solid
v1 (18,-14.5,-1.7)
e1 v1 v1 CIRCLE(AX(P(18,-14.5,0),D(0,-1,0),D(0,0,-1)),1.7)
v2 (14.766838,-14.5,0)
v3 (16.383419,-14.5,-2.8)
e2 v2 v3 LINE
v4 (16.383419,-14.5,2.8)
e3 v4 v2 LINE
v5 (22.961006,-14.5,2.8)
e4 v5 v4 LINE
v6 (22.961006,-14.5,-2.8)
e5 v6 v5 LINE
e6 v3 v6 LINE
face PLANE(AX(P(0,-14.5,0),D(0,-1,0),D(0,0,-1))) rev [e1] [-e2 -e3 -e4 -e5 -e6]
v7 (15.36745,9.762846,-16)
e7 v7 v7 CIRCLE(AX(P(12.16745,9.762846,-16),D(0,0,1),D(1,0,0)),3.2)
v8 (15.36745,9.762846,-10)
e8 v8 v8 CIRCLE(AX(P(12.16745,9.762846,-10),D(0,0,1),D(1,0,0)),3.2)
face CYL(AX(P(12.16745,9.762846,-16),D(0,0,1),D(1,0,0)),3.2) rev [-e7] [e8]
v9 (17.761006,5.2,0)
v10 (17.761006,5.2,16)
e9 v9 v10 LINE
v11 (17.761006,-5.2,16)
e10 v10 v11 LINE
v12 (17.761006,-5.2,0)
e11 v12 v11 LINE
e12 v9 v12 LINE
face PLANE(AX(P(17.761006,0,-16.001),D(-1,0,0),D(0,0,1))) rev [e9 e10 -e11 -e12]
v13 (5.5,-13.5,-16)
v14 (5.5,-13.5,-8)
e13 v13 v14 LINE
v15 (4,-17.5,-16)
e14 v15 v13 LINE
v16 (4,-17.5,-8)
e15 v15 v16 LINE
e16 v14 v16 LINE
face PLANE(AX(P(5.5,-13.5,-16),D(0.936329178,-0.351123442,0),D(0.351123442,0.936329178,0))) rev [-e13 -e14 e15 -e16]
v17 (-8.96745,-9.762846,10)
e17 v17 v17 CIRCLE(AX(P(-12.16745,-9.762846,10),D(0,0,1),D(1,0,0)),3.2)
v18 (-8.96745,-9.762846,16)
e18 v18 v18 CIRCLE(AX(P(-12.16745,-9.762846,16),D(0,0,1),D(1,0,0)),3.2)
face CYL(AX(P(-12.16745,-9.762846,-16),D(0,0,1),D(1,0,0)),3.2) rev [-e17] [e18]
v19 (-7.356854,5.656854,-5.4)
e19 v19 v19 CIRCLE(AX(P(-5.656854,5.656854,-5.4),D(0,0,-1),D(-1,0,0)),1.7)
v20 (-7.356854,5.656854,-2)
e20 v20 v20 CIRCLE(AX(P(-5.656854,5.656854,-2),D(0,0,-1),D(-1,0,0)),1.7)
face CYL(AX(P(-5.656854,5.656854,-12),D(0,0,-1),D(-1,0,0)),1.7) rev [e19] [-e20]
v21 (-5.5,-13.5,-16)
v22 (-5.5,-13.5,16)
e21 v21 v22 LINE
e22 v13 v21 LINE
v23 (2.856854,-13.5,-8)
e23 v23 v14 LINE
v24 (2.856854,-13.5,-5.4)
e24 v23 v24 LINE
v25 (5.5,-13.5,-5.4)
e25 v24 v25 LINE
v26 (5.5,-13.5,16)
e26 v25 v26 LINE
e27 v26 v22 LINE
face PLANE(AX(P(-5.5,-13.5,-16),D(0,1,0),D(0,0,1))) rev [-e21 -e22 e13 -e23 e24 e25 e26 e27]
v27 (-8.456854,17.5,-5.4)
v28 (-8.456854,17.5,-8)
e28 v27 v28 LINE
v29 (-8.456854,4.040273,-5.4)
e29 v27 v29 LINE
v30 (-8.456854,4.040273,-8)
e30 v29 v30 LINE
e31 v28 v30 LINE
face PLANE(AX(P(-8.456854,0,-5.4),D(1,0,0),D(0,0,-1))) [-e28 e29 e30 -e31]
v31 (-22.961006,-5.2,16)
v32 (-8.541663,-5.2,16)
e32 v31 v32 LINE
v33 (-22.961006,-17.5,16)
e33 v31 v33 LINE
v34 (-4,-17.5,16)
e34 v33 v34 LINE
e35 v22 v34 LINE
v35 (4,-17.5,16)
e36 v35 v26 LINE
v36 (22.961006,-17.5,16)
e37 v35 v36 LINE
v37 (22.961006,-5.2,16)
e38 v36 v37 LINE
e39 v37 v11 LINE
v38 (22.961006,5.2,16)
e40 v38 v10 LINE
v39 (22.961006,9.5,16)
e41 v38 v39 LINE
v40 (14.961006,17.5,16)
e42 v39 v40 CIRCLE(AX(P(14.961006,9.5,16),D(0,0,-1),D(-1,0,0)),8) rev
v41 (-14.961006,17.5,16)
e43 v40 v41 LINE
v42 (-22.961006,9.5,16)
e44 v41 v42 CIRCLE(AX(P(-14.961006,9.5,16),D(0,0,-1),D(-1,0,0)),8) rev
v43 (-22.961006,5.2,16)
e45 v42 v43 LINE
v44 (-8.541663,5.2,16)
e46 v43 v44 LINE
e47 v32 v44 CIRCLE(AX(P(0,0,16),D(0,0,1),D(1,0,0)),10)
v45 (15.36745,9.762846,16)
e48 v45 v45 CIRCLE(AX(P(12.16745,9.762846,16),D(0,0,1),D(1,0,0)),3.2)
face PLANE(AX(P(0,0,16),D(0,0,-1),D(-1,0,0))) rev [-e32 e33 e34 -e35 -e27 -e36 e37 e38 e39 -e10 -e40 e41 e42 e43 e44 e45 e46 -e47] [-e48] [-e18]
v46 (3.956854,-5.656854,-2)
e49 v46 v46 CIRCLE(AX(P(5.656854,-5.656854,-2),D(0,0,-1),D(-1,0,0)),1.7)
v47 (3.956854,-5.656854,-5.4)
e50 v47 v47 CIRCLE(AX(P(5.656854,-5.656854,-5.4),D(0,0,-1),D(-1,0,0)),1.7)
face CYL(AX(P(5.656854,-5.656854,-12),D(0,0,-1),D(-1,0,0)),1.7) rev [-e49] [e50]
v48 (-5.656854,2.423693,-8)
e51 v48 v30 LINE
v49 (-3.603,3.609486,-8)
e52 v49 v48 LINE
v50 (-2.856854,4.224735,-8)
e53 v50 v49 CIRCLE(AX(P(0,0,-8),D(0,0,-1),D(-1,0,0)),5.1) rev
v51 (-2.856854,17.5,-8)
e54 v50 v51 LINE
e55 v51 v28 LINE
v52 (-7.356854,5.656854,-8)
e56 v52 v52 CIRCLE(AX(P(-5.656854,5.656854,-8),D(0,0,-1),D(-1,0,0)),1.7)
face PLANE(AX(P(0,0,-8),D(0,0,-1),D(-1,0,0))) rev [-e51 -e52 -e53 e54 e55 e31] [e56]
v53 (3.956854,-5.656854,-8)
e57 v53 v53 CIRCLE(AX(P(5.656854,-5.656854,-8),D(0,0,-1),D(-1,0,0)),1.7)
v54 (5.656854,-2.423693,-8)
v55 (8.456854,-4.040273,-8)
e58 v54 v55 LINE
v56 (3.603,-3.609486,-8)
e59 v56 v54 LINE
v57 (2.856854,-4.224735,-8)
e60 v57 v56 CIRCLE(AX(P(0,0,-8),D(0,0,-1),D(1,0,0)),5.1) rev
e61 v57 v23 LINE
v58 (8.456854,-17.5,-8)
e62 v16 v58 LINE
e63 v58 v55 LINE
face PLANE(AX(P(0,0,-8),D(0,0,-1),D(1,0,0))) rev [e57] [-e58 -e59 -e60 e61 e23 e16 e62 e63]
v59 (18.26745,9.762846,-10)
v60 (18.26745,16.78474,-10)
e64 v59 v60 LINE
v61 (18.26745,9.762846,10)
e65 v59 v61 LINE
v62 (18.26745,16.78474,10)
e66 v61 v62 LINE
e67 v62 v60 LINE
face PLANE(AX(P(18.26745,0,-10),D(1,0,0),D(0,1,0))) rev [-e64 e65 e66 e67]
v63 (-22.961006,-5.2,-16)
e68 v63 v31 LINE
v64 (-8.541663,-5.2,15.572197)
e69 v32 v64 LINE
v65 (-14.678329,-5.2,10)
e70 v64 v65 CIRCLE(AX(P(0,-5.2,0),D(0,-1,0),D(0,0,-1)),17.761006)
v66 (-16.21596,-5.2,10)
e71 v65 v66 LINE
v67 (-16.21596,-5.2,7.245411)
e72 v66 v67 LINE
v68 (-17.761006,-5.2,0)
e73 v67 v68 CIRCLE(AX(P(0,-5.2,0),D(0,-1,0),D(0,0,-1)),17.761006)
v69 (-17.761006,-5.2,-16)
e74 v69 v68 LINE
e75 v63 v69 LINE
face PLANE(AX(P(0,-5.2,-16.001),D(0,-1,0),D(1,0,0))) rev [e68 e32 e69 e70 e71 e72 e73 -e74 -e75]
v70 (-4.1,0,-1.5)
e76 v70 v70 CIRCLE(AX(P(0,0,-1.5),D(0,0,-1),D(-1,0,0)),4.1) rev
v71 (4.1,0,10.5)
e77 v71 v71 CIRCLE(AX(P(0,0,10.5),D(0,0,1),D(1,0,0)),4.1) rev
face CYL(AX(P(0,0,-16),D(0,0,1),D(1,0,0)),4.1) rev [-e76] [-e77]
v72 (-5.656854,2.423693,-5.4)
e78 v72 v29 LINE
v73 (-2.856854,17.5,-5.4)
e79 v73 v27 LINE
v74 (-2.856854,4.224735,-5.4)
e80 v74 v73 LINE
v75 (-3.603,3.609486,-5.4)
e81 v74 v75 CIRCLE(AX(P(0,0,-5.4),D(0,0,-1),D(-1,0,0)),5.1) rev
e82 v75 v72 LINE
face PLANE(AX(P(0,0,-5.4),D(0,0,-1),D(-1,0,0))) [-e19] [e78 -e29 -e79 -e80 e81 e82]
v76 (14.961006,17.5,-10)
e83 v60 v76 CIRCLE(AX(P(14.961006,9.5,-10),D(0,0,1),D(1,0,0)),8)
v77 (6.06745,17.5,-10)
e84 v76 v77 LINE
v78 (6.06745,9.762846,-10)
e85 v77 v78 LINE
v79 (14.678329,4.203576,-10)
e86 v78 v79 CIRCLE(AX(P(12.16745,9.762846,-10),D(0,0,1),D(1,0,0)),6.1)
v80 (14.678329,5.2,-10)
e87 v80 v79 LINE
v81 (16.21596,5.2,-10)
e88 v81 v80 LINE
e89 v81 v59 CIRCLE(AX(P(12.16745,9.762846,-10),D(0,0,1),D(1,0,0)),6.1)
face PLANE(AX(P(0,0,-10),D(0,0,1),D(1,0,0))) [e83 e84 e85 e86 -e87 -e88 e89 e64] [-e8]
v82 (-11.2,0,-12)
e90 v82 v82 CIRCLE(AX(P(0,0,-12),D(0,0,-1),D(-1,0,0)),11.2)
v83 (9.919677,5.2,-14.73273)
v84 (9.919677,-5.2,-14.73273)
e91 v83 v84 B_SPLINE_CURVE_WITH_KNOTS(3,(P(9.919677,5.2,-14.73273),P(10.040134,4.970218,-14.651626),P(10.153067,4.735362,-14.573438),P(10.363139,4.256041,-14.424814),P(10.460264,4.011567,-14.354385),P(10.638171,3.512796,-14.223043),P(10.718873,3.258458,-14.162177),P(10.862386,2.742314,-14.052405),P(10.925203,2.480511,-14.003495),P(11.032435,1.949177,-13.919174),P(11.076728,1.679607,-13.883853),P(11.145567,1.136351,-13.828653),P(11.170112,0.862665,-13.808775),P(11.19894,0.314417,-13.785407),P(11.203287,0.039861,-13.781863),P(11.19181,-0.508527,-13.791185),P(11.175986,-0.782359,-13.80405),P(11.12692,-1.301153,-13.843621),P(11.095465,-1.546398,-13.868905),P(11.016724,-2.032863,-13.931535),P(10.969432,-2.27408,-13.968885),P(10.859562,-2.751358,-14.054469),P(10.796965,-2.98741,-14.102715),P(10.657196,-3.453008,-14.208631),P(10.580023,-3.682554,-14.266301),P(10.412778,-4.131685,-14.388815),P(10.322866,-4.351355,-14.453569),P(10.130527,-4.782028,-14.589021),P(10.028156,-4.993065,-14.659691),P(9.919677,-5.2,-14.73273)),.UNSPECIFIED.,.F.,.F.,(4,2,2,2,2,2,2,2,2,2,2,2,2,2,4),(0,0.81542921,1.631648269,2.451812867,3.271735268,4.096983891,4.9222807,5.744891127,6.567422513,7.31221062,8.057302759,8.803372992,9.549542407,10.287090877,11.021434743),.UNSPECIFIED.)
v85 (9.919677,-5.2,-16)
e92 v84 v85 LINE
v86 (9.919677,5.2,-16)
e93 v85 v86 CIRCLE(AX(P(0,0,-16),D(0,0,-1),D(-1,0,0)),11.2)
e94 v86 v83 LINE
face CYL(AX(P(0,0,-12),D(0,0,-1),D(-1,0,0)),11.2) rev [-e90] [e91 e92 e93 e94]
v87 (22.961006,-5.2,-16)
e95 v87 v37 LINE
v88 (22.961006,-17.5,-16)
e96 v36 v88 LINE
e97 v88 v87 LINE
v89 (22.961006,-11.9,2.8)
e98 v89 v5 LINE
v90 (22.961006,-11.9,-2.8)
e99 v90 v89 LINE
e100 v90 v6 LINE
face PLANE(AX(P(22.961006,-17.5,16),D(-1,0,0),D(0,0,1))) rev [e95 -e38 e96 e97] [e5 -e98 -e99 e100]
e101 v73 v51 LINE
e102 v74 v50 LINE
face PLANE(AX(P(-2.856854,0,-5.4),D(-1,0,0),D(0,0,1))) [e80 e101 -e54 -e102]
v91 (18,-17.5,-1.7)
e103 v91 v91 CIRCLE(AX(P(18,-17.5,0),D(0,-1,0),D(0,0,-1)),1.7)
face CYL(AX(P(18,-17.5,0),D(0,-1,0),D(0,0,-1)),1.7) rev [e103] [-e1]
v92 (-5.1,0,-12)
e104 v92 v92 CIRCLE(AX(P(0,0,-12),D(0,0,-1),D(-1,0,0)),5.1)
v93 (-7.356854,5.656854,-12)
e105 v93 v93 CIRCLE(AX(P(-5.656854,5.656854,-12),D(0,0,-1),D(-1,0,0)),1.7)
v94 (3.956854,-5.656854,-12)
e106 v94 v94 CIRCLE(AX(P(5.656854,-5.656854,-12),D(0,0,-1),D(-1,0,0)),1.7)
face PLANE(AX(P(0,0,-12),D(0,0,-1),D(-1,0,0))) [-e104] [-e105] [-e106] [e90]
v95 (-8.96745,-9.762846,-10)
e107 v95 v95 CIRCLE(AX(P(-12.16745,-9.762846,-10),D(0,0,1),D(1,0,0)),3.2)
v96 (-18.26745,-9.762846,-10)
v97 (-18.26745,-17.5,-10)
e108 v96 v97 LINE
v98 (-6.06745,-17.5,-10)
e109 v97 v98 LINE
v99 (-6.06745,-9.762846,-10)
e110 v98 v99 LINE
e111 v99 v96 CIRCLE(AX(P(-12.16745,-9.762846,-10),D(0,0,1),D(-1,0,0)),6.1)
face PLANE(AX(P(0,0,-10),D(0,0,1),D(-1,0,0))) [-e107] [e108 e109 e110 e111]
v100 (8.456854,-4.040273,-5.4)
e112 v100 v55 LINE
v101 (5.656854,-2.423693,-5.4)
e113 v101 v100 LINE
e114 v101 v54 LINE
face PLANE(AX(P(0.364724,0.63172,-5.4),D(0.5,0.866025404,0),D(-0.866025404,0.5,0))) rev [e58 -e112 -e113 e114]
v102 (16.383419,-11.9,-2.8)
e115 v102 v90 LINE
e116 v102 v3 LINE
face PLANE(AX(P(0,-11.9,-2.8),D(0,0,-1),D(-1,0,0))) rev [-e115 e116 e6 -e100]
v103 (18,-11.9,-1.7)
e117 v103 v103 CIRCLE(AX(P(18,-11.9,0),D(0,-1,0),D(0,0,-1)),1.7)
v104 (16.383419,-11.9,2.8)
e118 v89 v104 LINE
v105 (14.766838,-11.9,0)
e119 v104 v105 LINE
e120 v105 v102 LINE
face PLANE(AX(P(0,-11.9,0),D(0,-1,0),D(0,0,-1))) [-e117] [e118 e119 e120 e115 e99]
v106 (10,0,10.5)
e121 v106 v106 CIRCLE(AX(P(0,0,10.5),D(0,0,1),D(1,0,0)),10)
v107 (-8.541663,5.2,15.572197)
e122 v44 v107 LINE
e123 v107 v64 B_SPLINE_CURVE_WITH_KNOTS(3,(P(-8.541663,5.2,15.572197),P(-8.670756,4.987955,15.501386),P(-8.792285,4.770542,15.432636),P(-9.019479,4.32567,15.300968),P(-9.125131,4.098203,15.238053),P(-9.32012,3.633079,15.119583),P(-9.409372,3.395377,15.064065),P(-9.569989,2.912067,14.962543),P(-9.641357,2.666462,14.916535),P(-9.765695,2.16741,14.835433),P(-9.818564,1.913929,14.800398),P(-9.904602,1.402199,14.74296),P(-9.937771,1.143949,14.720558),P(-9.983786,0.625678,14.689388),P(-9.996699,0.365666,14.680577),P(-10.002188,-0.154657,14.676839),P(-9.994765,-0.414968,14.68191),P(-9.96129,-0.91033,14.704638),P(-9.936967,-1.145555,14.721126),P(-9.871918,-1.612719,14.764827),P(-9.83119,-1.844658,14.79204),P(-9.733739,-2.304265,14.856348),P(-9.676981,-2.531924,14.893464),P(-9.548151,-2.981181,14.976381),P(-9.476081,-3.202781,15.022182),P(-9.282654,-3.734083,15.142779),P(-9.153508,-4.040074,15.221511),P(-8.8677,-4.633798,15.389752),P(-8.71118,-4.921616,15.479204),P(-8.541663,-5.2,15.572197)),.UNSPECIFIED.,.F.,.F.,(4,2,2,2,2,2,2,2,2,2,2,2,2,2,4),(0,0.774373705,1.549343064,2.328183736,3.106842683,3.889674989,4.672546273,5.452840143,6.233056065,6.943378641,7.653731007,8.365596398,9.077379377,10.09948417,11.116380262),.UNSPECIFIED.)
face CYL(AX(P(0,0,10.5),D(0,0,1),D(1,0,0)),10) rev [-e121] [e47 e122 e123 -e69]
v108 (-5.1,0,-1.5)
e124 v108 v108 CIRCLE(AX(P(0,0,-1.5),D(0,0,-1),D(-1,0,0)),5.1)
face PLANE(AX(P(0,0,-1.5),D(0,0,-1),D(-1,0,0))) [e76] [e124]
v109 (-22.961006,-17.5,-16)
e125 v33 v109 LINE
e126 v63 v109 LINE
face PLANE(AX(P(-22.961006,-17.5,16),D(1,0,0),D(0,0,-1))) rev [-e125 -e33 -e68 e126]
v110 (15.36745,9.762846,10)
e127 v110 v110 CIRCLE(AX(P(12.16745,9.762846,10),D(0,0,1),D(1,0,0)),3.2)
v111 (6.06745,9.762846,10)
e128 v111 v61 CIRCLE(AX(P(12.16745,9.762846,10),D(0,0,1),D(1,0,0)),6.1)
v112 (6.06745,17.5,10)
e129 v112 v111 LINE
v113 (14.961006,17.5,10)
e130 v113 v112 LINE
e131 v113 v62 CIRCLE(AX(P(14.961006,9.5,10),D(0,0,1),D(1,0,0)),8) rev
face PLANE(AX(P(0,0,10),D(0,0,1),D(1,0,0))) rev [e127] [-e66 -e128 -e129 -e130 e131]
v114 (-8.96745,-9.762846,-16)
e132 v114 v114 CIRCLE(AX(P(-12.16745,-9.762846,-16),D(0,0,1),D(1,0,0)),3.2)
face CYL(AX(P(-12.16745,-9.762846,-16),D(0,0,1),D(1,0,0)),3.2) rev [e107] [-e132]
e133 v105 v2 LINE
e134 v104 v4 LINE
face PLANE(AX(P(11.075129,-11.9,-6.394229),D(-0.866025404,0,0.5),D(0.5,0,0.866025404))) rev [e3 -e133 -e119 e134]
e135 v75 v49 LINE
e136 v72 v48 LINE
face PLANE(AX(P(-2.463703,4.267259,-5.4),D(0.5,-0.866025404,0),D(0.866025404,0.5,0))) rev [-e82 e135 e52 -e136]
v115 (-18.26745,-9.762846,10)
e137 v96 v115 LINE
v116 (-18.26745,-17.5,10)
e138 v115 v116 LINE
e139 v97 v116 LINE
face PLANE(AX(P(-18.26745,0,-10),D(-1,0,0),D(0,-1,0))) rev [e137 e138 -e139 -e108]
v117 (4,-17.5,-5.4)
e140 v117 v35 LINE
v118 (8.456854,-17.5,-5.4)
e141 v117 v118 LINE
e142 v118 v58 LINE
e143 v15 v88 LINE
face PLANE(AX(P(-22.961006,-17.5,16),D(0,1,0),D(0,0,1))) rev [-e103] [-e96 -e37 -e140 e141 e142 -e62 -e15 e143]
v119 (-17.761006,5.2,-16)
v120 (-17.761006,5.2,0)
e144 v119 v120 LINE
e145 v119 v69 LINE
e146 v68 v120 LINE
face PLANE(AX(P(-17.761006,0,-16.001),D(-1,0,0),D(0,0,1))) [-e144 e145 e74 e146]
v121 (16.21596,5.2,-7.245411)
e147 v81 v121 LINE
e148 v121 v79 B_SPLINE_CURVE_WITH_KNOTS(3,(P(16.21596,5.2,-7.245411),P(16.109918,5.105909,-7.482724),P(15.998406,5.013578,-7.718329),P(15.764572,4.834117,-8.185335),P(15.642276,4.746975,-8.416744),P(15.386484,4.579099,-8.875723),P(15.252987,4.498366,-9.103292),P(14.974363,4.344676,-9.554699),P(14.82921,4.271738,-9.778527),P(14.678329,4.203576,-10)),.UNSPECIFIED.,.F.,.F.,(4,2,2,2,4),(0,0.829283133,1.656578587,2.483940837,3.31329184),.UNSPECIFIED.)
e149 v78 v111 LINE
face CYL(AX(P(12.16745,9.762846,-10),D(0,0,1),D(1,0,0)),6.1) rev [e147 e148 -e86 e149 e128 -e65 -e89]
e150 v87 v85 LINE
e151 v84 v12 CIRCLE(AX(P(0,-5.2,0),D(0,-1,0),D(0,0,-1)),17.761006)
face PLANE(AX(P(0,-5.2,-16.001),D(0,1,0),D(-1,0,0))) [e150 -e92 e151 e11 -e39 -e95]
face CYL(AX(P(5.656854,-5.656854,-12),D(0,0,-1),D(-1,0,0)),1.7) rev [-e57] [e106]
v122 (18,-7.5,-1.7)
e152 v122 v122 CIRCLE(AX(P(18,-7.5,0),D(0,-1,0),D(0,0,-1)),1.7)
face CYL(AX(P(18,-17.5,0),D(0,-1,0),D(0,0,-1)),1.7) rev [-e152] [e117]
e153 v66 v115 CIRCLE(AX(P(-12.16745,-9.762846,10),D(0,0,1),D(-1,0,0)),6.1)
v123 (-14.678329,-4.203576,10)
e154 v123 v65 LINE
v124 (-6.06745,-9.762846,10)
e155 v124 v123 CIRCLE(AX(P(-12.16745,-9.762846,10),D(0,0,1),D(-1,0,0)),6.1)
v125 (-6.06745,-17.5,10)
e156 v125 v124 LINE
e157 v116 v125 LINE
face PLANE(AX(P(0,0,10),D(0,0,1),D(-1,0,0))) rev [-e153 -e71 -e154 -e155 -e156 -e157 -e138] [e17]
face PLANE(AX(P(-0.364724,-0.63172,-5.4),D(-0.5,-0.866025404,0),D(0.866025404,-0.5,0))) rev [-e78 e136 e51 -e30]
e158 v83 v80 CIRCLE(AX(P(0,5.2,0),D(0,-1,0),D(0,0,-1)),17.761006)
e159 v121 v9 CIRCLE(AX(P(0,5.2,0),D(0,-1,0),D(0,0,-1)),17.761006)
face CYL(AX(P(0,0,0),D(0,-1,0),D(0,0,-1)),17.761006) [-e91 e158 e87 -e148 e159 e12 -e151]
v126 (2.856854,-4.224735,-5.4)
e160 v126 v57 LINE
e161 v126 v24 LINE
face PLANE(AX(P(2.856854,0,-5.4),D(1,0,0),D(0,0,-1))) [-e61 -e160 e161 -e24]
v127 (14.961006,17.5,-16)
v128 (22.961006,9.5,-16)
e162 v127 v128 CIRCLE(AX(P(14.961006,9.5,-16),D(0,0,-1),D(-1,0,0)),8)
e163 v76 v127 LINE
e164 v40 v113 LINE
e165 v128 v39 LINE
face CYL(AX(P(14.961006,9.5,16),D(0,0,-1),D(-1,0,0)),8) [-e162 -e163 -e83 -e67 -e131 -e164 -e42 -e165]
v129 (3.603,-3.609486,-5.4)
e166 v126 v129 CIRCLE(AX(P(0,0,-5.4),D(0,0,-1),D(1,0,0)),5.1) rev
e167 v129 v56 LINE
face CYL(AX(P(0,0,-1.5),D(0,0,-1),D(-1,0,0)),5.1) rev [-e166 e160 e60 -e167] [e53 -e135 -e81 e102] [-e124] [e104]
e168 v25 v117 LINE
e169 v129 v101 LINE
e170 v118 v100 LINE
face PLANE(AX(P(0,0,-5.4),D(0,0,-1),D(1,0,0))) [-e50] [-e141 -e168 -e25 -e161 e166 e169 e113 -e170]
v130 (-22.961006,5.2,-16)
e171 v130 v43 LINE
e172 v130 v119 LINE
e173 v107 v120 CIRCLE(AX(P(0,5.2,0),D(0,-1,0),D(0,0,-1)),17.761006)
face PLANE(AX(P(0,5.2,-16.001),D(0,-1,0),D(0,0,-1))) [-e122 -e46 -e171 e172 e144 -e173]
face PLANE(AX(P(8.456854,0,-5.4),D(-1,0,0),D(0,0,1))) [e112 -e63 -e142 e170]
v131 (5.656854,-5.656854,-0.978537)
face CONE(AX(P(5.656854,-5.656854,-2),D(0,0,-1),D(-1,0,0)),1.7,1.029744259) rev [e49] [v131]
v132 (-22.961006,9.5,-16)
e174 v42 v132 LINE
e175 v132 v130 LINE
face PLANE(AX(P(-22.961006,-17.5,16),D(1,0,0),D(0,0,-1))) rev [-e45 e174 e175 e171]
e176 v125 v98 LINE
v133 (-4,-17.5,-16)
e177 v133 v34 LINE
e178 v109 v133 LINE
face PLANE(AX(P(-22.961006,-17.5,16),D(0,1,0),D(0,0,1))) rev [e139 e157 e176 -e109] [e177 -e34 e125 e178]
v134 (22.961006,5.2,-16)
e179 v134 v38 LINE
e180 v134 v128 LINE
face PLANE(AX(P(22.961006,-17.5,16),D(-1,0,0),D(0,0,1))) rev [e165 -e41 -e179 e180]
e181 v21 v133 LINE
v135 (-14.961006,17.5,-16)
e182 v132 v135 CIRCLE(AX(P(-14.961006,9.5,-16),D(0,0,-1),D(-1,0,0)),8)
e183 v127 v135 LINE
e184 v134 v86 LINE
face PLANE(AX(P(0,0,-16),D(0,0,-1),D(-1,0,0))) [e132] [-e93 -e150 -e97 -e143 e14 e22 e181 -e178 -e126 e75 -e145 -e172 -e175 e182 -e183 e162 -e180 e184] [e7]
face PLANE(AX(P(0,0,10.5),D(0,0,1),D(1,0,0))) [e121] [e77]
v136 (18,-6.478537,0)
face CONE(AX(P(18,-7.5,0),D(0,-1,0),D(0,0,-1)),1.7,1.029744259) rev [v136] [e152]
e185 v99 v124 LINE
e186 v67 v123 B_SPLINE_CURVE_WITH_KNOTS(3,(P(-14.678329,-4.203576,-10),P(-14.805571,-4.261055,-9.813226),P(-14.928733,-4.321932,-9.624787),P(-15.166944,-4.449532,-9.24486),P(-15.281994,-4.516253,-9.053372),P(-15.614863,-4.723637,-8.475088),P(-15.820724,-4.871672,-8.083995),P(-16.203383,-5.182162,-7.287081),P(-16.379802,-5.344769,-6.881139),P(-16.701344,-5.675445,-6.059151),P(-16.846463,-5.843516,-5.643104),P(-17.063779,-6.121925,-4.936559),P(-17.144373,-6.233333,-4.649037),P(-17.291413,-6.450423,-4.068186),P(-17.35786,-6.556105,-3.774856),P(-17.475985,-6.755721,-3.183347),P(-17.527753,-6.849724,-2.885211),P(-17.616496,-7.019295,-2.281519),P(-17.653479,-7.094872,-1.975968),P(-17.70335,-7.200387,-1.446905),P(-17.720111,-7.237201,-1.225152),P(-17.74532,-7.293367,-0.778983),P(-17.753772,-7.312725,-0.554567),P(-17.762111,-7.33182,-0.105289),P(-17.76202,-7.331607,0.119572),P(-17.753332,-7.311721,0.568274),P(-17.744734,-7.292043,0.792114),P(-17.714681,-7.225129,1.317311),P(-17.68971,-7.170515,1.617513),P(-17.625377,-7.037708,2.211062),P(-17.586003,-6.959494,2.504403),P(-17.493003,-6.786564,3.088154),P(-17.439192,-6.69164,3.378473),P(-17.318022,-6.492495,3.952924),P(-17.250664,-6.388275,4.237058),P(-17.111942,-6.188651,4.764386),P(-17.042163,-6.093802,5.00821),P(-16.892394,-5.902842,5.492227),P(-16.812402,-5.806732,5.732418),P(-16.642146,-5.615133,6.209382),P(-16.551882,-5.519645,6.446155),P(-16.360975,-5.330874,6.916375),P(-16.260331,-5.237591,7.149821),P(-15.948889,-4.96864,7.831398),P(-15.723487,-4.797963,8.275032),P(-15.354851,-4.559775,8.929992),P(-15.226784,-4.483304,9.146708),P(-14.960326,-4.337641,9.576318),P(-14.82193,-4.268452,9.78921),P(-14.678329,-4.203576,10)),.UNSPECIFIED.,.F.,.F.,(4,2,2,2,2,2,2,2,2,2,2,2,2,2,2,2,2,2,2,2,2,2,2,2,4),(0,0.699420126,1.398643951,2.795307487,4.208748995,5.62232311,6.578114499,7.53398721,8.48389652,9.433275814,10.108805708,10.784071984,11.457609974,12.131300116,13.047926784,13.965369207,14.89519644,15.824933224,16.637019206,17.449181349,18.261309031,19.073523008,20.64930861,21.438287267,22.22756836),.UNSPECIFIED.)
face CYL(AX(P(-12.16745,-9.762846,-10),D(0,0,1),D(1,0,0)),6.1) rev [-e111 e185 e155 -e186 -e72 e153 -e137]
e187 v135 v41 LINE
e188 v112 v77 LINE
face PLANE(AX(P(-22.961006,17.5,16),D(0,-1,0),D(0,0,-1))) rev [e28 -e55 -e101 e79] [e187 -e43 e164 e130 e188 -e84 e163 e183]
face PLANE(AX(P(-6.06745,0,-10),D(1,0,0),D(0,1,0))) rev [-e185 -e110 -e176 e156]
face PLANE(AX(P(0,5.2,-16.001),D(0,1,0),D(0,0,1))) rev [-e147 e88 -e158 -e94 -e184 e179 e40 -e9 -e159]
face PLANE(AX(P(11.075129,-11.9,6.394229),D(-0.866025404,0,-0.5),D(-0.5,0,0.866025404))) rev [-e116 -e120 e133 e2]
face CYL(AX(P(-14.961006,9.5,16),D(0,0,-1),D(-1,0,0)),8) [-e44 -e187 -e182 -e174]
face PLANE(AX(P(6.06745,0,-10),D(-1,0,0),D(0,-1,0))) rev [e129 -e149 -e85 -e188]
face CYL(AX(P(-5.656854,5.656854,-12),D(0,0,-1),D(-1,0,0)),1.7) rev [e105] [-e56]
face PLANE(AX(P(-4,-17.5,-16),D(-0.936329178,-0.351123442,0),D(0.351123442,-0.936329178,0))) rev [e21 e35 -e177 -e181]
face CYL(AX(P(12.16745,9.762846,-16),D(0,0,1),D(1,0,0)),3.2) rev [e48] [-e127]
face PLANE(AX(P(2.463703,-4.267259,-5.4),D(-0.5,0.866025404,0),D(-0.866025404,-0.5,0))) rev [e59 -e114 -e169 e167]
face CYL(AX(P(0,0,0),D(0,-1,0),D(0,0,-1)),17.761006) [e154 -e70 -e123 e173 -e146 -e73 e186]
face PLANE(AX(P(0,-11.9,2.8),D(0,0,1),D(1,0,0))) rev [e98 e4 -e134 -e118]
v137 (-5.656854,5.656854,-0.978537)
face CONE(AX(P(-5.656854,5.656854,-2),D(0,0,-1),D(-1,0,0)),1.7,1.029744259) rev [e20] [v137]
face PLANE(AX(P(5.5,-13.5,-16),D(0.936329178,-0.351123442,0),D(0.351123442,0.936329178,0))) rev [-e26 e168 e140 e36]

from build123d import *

# Parameters (mm, degrees)
SKETCH1_W                = 45.922011884
SKETCH1_H                = 35
BOSS_EXTRUDE1_DEPTH      = 16
CUT_EXTRUDE1_DEPTH       = 34.006935542
CUT_EXTRUDE1_DEPTH_BACK  = 34.006935542
SKETCH2_R                = 4.1
CUT_EXTRUDE2_REACH       = 45.098
SKETCH4_W                = 5
SKETCH4_H                = 10
CUT_EXTRUDE3_DEPTH       = 10
SKETCH6_R                = 11.2
CUT_EXTRUDE4_DEPTH       = 4
SKETCH7_R                = 5.1
CUT_EXTRUDE5_DEPTH       = 10.5
CIRPATTERN1_COUNT        = 2
CUT_EXTRUDE6_DEPTH       = 34.006935542
CUT_EXTRUDE6_DEPTH_BACK  = 34.006935542
SKETCH8_R                = 3.2
FILLET1_R                = 8
CUT_EXTRUDE8_START       = -4
SKETCH9_R                = 5.1
CUT_EXTRUDE8_DEPTH       = 2.6
CIRPATTERN2_COUNT        = 2
SKETCH13_W               = 32.238994058
SKETCH13_H               = 10.4
CUT_REVOLVE1_ANGLE       = 90
SKETCH14_R               = 10
CUT_EXTRUDE9_DEPTH       = 5.5
CUT_EXTRUDE10_DEPTH      = 44.098234306
CUT_EXTRUDE11_START      = -3
CUT_EXTRUDE11_DEPTH      = 2.6
M3_CLEARANCE_HOLE2_D     = 3.4
M3_CLEARANCE_HOLE2_DEPTH = 10
M3_CLEARANCE_HOLE2_TIP   = 1.021463052


with BuildPart() as part:
    # Sketch1 → Boss-Extrude1 (new, symmetric)
    with BuildSketch(Plane.XY):
        Rectangle(SKETCH1_W, SKETCH1_H)
    extrude(amount=BOSS_EXTRUDE1_DEPTH, both=True)

    # Sketch2 → Cut-Extrude1 (cut, two sides: drawn at the far end of the back side and taken through both)
    with BuildSketch(Plane.XY.offset(-CUT_EXTRUDE1_DEPTH_BACK)):
        Circle(SKETCH2_R)
    extrude(amount=CUT_EXTRUDE1_DEPTH + CUT_EXTRUDE1_DEPTH_BACK, mode=Mode.SUBTRACT)

    # Sketch4 → Cut-Extrude2 (cut, up to next)
    with BuildSketch(Plane.XY.offset(16), mode=Mode.PRIVATE) as cut_extrude2_sk1:
        with Locations((20.461005942, 0)):
            Rectangle(SKETCH4_W, SKETCH4_H)
    cut_extrude2_tool1 = extrude(cut_extrude2_sk1.sketch, amount=-CUT_EXTRUDE2_REACH, mode=Mode.PRIVATE) & part.part
    # Sketch4 → Cut-Extrude2 (cut, up to next)
    with BuildSketch(Plane.XY.offset(16), mode=Mode.PRIVATE) as cut_extrude2_sk2:
        with Locations((-20.461005942, 0)):
            Rectangle(SKETCH4_W, SKETCH4_H)
    cut_extrude2_tool2 = extrude(cut_extrude2_sk2.sketch, amount=-CUT_EXTRUDE2_REACH, mode=Mode.PRIVATE) & part.part
    # Sketch4 → Cut-Extrude2 (cut, up to next)
    with BuildSketch(Plane.XY.offset(16), mode=Mode.PRIVATE) as cut_extrude2_sk3:
        Polygon((17.961005942, 5), (22.961005942, 5), (22.961005942, 5.2), (17.761005942, 5.2), (17.761005942, -5.2), (22.961005942, -5.2), (22.961005942, -5), (17.961005942, -5), align=None)
    cut_extrude2_tool3 = extrude(cut_extrude2_sk3.sketch, amount=-CUT_EXTRUDE2_REACH, mode=Mode.PRIVATE) & part.part
    # Sketch4 → Cut-Extrude2 (cut, up to next)
    with BuildSketch(Plane.XY.offset(16), mode=Mode.PRIVATE) as cut_extrude2_sk4:
        Polygon((-22.961005942, 5.2), (-22.961005942, 5), (-17.961005942, 5), (-17.961005942, -5), (-22.961005942, -5), (-22.961005942, -5.2), (-17.761005942, -5.2), (-17.761005942, 5.2), align=None)
    cut_extrude2_tool4 = extrude(cut_extrude2_sk4.sketch, amount=-CUT_EXTRUDE2_REACH, mode=Mode.PRIVATE) & part.part
    add(cut_extrude2_tool1.solids().sort_by_distance((20.461006, 0, 16))[0], mode=Mode.SUBTRACT)
    add(cut_extrude2_tool2.solids().sort_by_distance((-20.461006, 0, 16))[0], mode=Mode.SUBTRACT)
    add(cut_extrude2_tool3.solids().sort_by_distance((17.84473, 0, 16))[0], mode=Mode.SUBTRACT)
    add(cut_extrude2_tool4.solids().sort_by_distance((-22.84473, 5.1, 16))[0], mode=Mode.SUBTRACT)

    # Sketch5 → Cut-Extrude3 (cut, symmetric)
    # profile 1 of 2: a face of its own
    with BuildSketch(Plane.XY):
        with BuildLine():
            Line((6.067449647, 17.6), (6.067449647, 9.762846361))
            ThreePointArc((6.067449647, 9.762846361), (12.167449647, 3.662846361), (18.267449647, 9.762846361))
            Line((18.267449647, 9.762846361), (18.267449647, 17.6))
            Line((18.267449647, 17.6), (6.067449647, 17.6))
        make_face()
        with BuildLine():
            ThreePointArc((6.167449647, 9.762846361), (12.167449647, 3.762846361), (18.167449647, 9.762846361))
            Line((18.167449647, 9.762846361), (18.167449647, 17.5))
            Line((18.167449647, 17.5), (6.167449647, 17.5))
            Line((6.167449647, 17.5), (6.167449647, 9.762846361))
        make_face(mode=Mode.SUBTRACT)
    # profile 2 of 2: a face of its own
    with BuildSketch(Plane.XY):
        with BuildLine():
            Line((6.167449647, 17.5), (6.167449647, 9.762846361))
            ThreePointArc((6.167449647, 9.762846361), (12.167449647, 3.762846361), (18.167449647, 9.762846361))
            Line((18.167449647, 9.762846361), (18.167449647, 17.5))
            Line((18.167449647, 17.5), (6.167449647, 17.5))
        make_face()
    cut_extrude3 = extrude(amount=CUT_EXTRUDE3_DEPTH, both=True, mode=Mode.SUBTRACT)

    # Sketch6 → Cut-Extrude4 (cut)
    with BuildSketch(Plane(origin=(0, 0, -16), x_dir=(-1, 0, 0), z_dir=(0, 0, -1))):
        Circle(SKETCH6_R)
    extrude(amount=-CUT_EXTRUDE4_DEPTH, mode=Mode.SUBTRACT)

    # Sketch7 → Cut-Extrude5 (cut)
    with BuildSketch(Plane(origin=(0, 0, -12), x_dir=(-1, 0, 0), z_dir=(0, 0, -1))):
        Circle(SKETCH7_R)
    extrude(amount=-CUT_EXTRUDE5_DEPTH, mode=Mode.SUBTRACT)

    # CirPattern1: Cut-Extrude3 ×2 about axis
    cirpattern1_axis = Axis((0, 0, 0), (0, 0, 1))
    for i in range(1, CIRPATTERN1_COUNT):
        add(cut_extrude3.rotate(cirpattern1_axis, i * 360 / CIRPATTERN1_COUNT), mode=Mode.SUBTRACT)

    # Sketch8 → Cut-Extrude6 (cut, two sides: drawn at the far end of the back side and taken through both)
    with BuildSketch(Plane.XY.offset(-CUT_EXTRUDE6_DEPTH_BACK)):
        with Locations((-12.167449647, -9.762846361)):
            Circle(SKETCH8_R)
        with Locations((12.167449647, 9.762846361)):
            Circle(SKETCH8_R)
    extrude(amount=CUT_EXTRUDE6_DEPTH + CUT_EXTRUDE6_DEPTH_BACK, mode=Mode.SUBTRACT)

    # Fillet1
    # the kernel refuses this fillet: 8 mm, written as the material it takes off along each edge
    with BuildSketch(Plane(origin=(22.961005942, 17.5, -36), x_dir=(-1, 0, 0), z_dir=(0, 0, 1))) as fillet1_piece_1:
        with BuildLine():
            CenterArc((FILLET1_R, FILLET1_R), FILLET1_R, 180, 90)
            Line((0, FILLET1_R), (0, 0))
            Line((0, 0), (FILLET1_R, 0))
        make_face()
    extrude(amount=72, mode=Mode.SUBTRACT)
    with BuildSketch(Plane(origin=(-22.961005942, 17.5, 36), x_dir=(0, -1, 0), z_dir=(0, 0, -1))) as fillet1_piece_2:
        with BuildLine():
            CenterArc((FILLET1_R, -FILLET1_R), FILLET1_R, 90, 90)
            Line((0, -FILLET1_R), (0, 0))
            Line((0, 0), (FILLET1_R, 0))
        make_face()
    extrude(amount=72, mode=Mode.SUBTRACT)

    # Sketch9 → Cut-Extrude8 (cut)
    with BuildSketch(Plane(origin=(0, 0, -12), x_dir=(-1, 0, 0), z_dir=(0, 0, -1)).offset(CUT_EXTRUDE8_START)):
        with BuildLine():
            Line((2.856854249, 17.5), (2.856854249, 10.829514477))
            ThreePointArc((2.856854249, 10.829514477), (5.919350665, 9.507959177), (8.456854249, 7.34313395))
            Line((8.456854249, 7.34313395), (8.456854249, 17.5))
            Line((8.456854249, 17.5), (2.856854249, 17.5))
        make_face()
        Circle(SKETCH9_R)
        Polygon((2.856854249, 4.040273496), (5.656854249, 2.423692742), (8.456854249, 4.040273496), (8.456854249, 7.273435003), (5.656854249, 8.890015757), (2.856854249, 7.273435003), align=None)
        with BuildLine():
            Line((2.856854249, 10.829514477), (2.856854249, 7.273435003))
            Line((2.856854249, 7.273435003), (5.656854249, 8.890015757))
            Line((5.656854249, 8.890015757), (8.456854249, 7.273435003))
            Line((8.456854249, 7.273435003), (8.456854249, 7.34313395))
            ThreePointArc((8.456854249, 7.34313395), (5.919350665, 9.507959177), (2.856854249, 10.829514477))
        make_face()
    cut_extrude8 = extrude(amount=-CUT_EXTRUDE8_DEPTH, mode=Mode.SUBTRACT)

    # Sketch11 → M3 Clearance Hole1 (revolve, cut)
    with BuildSketch(Plane(origin=(-5.656854249, 5.656854249, -12), x_dir=(0, 1, 0), z_dir=(1, 0, 0))):
        Polygon((0, 0), (0, 11.021463052), (1.7, 10), (1.7, 0), align=None)
    m3_clearance_hole1 = revolve(axis=Axis((-5.656854249, 5.656854249, -18.35), (0, 0, 1)), mode=Mode.SUBTRACT)

    # CirPattern2: Cut-Extrude8, M3 Clearance Hole1 ×2 about axis
    cirpattern2_axis = Axis((0, 0, 0), (0, 0, 1))
    add([cut_extrude8.rotate(cirpattern2_axis, i * 360 / CIRPATTERN2_COUNT) for i in range(1, CIRPATTERN2_COUNT)], mode=Mode.SUBTRACT)
    add([m3_clearance_hole1.rotate(cirpattern2_axis, i * 360 / CIRPATTERN2_COUNT) for i in range(1, CIRPATTERN2_COUNT)], mode=Mode.SUBTRACT)

    # Sketch13 → Cut-Revolve1 (revolve, cut)
    with BuildSketch(Plane.XY):
        with Locations((33.880502971, 0)):
            Rectangle(SKETCH13_W, SKETCH13_H)
        with Locations((-33.880502971, 0)):
            Rectangle(SKETCH13_W, SKETCH13_H)
    revolve(axis=Axis((0, 0, 0), (0, 1, 0)), revolution_arc=CUT_REVOLVE1_ANGLE, mode=Mode.SUBTRACT)

    # Sketch14 → Cut-Extrude9 (cut)
    with BuildSketch(Plane.XY.offset(16)):
        Circle(SKETCH14_R)
    extrude(amount=-CUT_EXTRUDE9_DEPTH, mode=Mode.SUBTRACT)

    # Sketch15 → Cut-Extrude10 (cut, through all)
    with BuildSketch(Plane.XY.offset(16)):
        Polygon((-4, -17.5), (-5.5, -13.5), (5.5, -13.5), (4, -17.5), align=None)
    extrude(amount=-CUT_EXTRUDE10_DEPTH, mode=Mode.SUBTRACT)

    # Sketch16 → Cut-Extrude11 (cut)
    with BuildSketch(Plane.XZ.offset(17.5).offset(CUT_EXTRUDE11_START)):
        Polygon((19.616580754, -2.8), (21.233161507, 0), (19.616580754, 2.8), (16.383419246, 2.8), (14.766838493, 0), (16.383419246, -2.8), align=None)
        Polygon((21.233161507, 0), (19.616580754, -2.8), (22.961005942, -2.8), (22.961005942, 2.8), (19.616580754, 2.8), align=None)
    extrude(amount=-CUT_EXTRUDE11_DEPTH, mode=Mode.SUBTRACT)

    # M3 Clearance Hole2
    with Locations(Plane(origin=(0, -17.5, 0), x_dir=(-1, 0, 0), z_dir=(0, -1, 0))):
        with Locations((-18, 0)):
            Hole(M3_CLEARANCE_HOLE2_D / 2, depth=M3_CLEARANCE_HOLE2_DEPTH)
            with Locations((0, 0, -(M3_CLEARANCE_HOLE2_DEPTH + M3_CLEARANCE_HOLE2_TIP / 2))):  # 118° drill point
                Cone(0, M3_CLEARANCE_HOLE2_D / 2, M3_CLEARANCE_HOLE2_TIP, mode=Mode.SUBTRACT)


solid = part.part
